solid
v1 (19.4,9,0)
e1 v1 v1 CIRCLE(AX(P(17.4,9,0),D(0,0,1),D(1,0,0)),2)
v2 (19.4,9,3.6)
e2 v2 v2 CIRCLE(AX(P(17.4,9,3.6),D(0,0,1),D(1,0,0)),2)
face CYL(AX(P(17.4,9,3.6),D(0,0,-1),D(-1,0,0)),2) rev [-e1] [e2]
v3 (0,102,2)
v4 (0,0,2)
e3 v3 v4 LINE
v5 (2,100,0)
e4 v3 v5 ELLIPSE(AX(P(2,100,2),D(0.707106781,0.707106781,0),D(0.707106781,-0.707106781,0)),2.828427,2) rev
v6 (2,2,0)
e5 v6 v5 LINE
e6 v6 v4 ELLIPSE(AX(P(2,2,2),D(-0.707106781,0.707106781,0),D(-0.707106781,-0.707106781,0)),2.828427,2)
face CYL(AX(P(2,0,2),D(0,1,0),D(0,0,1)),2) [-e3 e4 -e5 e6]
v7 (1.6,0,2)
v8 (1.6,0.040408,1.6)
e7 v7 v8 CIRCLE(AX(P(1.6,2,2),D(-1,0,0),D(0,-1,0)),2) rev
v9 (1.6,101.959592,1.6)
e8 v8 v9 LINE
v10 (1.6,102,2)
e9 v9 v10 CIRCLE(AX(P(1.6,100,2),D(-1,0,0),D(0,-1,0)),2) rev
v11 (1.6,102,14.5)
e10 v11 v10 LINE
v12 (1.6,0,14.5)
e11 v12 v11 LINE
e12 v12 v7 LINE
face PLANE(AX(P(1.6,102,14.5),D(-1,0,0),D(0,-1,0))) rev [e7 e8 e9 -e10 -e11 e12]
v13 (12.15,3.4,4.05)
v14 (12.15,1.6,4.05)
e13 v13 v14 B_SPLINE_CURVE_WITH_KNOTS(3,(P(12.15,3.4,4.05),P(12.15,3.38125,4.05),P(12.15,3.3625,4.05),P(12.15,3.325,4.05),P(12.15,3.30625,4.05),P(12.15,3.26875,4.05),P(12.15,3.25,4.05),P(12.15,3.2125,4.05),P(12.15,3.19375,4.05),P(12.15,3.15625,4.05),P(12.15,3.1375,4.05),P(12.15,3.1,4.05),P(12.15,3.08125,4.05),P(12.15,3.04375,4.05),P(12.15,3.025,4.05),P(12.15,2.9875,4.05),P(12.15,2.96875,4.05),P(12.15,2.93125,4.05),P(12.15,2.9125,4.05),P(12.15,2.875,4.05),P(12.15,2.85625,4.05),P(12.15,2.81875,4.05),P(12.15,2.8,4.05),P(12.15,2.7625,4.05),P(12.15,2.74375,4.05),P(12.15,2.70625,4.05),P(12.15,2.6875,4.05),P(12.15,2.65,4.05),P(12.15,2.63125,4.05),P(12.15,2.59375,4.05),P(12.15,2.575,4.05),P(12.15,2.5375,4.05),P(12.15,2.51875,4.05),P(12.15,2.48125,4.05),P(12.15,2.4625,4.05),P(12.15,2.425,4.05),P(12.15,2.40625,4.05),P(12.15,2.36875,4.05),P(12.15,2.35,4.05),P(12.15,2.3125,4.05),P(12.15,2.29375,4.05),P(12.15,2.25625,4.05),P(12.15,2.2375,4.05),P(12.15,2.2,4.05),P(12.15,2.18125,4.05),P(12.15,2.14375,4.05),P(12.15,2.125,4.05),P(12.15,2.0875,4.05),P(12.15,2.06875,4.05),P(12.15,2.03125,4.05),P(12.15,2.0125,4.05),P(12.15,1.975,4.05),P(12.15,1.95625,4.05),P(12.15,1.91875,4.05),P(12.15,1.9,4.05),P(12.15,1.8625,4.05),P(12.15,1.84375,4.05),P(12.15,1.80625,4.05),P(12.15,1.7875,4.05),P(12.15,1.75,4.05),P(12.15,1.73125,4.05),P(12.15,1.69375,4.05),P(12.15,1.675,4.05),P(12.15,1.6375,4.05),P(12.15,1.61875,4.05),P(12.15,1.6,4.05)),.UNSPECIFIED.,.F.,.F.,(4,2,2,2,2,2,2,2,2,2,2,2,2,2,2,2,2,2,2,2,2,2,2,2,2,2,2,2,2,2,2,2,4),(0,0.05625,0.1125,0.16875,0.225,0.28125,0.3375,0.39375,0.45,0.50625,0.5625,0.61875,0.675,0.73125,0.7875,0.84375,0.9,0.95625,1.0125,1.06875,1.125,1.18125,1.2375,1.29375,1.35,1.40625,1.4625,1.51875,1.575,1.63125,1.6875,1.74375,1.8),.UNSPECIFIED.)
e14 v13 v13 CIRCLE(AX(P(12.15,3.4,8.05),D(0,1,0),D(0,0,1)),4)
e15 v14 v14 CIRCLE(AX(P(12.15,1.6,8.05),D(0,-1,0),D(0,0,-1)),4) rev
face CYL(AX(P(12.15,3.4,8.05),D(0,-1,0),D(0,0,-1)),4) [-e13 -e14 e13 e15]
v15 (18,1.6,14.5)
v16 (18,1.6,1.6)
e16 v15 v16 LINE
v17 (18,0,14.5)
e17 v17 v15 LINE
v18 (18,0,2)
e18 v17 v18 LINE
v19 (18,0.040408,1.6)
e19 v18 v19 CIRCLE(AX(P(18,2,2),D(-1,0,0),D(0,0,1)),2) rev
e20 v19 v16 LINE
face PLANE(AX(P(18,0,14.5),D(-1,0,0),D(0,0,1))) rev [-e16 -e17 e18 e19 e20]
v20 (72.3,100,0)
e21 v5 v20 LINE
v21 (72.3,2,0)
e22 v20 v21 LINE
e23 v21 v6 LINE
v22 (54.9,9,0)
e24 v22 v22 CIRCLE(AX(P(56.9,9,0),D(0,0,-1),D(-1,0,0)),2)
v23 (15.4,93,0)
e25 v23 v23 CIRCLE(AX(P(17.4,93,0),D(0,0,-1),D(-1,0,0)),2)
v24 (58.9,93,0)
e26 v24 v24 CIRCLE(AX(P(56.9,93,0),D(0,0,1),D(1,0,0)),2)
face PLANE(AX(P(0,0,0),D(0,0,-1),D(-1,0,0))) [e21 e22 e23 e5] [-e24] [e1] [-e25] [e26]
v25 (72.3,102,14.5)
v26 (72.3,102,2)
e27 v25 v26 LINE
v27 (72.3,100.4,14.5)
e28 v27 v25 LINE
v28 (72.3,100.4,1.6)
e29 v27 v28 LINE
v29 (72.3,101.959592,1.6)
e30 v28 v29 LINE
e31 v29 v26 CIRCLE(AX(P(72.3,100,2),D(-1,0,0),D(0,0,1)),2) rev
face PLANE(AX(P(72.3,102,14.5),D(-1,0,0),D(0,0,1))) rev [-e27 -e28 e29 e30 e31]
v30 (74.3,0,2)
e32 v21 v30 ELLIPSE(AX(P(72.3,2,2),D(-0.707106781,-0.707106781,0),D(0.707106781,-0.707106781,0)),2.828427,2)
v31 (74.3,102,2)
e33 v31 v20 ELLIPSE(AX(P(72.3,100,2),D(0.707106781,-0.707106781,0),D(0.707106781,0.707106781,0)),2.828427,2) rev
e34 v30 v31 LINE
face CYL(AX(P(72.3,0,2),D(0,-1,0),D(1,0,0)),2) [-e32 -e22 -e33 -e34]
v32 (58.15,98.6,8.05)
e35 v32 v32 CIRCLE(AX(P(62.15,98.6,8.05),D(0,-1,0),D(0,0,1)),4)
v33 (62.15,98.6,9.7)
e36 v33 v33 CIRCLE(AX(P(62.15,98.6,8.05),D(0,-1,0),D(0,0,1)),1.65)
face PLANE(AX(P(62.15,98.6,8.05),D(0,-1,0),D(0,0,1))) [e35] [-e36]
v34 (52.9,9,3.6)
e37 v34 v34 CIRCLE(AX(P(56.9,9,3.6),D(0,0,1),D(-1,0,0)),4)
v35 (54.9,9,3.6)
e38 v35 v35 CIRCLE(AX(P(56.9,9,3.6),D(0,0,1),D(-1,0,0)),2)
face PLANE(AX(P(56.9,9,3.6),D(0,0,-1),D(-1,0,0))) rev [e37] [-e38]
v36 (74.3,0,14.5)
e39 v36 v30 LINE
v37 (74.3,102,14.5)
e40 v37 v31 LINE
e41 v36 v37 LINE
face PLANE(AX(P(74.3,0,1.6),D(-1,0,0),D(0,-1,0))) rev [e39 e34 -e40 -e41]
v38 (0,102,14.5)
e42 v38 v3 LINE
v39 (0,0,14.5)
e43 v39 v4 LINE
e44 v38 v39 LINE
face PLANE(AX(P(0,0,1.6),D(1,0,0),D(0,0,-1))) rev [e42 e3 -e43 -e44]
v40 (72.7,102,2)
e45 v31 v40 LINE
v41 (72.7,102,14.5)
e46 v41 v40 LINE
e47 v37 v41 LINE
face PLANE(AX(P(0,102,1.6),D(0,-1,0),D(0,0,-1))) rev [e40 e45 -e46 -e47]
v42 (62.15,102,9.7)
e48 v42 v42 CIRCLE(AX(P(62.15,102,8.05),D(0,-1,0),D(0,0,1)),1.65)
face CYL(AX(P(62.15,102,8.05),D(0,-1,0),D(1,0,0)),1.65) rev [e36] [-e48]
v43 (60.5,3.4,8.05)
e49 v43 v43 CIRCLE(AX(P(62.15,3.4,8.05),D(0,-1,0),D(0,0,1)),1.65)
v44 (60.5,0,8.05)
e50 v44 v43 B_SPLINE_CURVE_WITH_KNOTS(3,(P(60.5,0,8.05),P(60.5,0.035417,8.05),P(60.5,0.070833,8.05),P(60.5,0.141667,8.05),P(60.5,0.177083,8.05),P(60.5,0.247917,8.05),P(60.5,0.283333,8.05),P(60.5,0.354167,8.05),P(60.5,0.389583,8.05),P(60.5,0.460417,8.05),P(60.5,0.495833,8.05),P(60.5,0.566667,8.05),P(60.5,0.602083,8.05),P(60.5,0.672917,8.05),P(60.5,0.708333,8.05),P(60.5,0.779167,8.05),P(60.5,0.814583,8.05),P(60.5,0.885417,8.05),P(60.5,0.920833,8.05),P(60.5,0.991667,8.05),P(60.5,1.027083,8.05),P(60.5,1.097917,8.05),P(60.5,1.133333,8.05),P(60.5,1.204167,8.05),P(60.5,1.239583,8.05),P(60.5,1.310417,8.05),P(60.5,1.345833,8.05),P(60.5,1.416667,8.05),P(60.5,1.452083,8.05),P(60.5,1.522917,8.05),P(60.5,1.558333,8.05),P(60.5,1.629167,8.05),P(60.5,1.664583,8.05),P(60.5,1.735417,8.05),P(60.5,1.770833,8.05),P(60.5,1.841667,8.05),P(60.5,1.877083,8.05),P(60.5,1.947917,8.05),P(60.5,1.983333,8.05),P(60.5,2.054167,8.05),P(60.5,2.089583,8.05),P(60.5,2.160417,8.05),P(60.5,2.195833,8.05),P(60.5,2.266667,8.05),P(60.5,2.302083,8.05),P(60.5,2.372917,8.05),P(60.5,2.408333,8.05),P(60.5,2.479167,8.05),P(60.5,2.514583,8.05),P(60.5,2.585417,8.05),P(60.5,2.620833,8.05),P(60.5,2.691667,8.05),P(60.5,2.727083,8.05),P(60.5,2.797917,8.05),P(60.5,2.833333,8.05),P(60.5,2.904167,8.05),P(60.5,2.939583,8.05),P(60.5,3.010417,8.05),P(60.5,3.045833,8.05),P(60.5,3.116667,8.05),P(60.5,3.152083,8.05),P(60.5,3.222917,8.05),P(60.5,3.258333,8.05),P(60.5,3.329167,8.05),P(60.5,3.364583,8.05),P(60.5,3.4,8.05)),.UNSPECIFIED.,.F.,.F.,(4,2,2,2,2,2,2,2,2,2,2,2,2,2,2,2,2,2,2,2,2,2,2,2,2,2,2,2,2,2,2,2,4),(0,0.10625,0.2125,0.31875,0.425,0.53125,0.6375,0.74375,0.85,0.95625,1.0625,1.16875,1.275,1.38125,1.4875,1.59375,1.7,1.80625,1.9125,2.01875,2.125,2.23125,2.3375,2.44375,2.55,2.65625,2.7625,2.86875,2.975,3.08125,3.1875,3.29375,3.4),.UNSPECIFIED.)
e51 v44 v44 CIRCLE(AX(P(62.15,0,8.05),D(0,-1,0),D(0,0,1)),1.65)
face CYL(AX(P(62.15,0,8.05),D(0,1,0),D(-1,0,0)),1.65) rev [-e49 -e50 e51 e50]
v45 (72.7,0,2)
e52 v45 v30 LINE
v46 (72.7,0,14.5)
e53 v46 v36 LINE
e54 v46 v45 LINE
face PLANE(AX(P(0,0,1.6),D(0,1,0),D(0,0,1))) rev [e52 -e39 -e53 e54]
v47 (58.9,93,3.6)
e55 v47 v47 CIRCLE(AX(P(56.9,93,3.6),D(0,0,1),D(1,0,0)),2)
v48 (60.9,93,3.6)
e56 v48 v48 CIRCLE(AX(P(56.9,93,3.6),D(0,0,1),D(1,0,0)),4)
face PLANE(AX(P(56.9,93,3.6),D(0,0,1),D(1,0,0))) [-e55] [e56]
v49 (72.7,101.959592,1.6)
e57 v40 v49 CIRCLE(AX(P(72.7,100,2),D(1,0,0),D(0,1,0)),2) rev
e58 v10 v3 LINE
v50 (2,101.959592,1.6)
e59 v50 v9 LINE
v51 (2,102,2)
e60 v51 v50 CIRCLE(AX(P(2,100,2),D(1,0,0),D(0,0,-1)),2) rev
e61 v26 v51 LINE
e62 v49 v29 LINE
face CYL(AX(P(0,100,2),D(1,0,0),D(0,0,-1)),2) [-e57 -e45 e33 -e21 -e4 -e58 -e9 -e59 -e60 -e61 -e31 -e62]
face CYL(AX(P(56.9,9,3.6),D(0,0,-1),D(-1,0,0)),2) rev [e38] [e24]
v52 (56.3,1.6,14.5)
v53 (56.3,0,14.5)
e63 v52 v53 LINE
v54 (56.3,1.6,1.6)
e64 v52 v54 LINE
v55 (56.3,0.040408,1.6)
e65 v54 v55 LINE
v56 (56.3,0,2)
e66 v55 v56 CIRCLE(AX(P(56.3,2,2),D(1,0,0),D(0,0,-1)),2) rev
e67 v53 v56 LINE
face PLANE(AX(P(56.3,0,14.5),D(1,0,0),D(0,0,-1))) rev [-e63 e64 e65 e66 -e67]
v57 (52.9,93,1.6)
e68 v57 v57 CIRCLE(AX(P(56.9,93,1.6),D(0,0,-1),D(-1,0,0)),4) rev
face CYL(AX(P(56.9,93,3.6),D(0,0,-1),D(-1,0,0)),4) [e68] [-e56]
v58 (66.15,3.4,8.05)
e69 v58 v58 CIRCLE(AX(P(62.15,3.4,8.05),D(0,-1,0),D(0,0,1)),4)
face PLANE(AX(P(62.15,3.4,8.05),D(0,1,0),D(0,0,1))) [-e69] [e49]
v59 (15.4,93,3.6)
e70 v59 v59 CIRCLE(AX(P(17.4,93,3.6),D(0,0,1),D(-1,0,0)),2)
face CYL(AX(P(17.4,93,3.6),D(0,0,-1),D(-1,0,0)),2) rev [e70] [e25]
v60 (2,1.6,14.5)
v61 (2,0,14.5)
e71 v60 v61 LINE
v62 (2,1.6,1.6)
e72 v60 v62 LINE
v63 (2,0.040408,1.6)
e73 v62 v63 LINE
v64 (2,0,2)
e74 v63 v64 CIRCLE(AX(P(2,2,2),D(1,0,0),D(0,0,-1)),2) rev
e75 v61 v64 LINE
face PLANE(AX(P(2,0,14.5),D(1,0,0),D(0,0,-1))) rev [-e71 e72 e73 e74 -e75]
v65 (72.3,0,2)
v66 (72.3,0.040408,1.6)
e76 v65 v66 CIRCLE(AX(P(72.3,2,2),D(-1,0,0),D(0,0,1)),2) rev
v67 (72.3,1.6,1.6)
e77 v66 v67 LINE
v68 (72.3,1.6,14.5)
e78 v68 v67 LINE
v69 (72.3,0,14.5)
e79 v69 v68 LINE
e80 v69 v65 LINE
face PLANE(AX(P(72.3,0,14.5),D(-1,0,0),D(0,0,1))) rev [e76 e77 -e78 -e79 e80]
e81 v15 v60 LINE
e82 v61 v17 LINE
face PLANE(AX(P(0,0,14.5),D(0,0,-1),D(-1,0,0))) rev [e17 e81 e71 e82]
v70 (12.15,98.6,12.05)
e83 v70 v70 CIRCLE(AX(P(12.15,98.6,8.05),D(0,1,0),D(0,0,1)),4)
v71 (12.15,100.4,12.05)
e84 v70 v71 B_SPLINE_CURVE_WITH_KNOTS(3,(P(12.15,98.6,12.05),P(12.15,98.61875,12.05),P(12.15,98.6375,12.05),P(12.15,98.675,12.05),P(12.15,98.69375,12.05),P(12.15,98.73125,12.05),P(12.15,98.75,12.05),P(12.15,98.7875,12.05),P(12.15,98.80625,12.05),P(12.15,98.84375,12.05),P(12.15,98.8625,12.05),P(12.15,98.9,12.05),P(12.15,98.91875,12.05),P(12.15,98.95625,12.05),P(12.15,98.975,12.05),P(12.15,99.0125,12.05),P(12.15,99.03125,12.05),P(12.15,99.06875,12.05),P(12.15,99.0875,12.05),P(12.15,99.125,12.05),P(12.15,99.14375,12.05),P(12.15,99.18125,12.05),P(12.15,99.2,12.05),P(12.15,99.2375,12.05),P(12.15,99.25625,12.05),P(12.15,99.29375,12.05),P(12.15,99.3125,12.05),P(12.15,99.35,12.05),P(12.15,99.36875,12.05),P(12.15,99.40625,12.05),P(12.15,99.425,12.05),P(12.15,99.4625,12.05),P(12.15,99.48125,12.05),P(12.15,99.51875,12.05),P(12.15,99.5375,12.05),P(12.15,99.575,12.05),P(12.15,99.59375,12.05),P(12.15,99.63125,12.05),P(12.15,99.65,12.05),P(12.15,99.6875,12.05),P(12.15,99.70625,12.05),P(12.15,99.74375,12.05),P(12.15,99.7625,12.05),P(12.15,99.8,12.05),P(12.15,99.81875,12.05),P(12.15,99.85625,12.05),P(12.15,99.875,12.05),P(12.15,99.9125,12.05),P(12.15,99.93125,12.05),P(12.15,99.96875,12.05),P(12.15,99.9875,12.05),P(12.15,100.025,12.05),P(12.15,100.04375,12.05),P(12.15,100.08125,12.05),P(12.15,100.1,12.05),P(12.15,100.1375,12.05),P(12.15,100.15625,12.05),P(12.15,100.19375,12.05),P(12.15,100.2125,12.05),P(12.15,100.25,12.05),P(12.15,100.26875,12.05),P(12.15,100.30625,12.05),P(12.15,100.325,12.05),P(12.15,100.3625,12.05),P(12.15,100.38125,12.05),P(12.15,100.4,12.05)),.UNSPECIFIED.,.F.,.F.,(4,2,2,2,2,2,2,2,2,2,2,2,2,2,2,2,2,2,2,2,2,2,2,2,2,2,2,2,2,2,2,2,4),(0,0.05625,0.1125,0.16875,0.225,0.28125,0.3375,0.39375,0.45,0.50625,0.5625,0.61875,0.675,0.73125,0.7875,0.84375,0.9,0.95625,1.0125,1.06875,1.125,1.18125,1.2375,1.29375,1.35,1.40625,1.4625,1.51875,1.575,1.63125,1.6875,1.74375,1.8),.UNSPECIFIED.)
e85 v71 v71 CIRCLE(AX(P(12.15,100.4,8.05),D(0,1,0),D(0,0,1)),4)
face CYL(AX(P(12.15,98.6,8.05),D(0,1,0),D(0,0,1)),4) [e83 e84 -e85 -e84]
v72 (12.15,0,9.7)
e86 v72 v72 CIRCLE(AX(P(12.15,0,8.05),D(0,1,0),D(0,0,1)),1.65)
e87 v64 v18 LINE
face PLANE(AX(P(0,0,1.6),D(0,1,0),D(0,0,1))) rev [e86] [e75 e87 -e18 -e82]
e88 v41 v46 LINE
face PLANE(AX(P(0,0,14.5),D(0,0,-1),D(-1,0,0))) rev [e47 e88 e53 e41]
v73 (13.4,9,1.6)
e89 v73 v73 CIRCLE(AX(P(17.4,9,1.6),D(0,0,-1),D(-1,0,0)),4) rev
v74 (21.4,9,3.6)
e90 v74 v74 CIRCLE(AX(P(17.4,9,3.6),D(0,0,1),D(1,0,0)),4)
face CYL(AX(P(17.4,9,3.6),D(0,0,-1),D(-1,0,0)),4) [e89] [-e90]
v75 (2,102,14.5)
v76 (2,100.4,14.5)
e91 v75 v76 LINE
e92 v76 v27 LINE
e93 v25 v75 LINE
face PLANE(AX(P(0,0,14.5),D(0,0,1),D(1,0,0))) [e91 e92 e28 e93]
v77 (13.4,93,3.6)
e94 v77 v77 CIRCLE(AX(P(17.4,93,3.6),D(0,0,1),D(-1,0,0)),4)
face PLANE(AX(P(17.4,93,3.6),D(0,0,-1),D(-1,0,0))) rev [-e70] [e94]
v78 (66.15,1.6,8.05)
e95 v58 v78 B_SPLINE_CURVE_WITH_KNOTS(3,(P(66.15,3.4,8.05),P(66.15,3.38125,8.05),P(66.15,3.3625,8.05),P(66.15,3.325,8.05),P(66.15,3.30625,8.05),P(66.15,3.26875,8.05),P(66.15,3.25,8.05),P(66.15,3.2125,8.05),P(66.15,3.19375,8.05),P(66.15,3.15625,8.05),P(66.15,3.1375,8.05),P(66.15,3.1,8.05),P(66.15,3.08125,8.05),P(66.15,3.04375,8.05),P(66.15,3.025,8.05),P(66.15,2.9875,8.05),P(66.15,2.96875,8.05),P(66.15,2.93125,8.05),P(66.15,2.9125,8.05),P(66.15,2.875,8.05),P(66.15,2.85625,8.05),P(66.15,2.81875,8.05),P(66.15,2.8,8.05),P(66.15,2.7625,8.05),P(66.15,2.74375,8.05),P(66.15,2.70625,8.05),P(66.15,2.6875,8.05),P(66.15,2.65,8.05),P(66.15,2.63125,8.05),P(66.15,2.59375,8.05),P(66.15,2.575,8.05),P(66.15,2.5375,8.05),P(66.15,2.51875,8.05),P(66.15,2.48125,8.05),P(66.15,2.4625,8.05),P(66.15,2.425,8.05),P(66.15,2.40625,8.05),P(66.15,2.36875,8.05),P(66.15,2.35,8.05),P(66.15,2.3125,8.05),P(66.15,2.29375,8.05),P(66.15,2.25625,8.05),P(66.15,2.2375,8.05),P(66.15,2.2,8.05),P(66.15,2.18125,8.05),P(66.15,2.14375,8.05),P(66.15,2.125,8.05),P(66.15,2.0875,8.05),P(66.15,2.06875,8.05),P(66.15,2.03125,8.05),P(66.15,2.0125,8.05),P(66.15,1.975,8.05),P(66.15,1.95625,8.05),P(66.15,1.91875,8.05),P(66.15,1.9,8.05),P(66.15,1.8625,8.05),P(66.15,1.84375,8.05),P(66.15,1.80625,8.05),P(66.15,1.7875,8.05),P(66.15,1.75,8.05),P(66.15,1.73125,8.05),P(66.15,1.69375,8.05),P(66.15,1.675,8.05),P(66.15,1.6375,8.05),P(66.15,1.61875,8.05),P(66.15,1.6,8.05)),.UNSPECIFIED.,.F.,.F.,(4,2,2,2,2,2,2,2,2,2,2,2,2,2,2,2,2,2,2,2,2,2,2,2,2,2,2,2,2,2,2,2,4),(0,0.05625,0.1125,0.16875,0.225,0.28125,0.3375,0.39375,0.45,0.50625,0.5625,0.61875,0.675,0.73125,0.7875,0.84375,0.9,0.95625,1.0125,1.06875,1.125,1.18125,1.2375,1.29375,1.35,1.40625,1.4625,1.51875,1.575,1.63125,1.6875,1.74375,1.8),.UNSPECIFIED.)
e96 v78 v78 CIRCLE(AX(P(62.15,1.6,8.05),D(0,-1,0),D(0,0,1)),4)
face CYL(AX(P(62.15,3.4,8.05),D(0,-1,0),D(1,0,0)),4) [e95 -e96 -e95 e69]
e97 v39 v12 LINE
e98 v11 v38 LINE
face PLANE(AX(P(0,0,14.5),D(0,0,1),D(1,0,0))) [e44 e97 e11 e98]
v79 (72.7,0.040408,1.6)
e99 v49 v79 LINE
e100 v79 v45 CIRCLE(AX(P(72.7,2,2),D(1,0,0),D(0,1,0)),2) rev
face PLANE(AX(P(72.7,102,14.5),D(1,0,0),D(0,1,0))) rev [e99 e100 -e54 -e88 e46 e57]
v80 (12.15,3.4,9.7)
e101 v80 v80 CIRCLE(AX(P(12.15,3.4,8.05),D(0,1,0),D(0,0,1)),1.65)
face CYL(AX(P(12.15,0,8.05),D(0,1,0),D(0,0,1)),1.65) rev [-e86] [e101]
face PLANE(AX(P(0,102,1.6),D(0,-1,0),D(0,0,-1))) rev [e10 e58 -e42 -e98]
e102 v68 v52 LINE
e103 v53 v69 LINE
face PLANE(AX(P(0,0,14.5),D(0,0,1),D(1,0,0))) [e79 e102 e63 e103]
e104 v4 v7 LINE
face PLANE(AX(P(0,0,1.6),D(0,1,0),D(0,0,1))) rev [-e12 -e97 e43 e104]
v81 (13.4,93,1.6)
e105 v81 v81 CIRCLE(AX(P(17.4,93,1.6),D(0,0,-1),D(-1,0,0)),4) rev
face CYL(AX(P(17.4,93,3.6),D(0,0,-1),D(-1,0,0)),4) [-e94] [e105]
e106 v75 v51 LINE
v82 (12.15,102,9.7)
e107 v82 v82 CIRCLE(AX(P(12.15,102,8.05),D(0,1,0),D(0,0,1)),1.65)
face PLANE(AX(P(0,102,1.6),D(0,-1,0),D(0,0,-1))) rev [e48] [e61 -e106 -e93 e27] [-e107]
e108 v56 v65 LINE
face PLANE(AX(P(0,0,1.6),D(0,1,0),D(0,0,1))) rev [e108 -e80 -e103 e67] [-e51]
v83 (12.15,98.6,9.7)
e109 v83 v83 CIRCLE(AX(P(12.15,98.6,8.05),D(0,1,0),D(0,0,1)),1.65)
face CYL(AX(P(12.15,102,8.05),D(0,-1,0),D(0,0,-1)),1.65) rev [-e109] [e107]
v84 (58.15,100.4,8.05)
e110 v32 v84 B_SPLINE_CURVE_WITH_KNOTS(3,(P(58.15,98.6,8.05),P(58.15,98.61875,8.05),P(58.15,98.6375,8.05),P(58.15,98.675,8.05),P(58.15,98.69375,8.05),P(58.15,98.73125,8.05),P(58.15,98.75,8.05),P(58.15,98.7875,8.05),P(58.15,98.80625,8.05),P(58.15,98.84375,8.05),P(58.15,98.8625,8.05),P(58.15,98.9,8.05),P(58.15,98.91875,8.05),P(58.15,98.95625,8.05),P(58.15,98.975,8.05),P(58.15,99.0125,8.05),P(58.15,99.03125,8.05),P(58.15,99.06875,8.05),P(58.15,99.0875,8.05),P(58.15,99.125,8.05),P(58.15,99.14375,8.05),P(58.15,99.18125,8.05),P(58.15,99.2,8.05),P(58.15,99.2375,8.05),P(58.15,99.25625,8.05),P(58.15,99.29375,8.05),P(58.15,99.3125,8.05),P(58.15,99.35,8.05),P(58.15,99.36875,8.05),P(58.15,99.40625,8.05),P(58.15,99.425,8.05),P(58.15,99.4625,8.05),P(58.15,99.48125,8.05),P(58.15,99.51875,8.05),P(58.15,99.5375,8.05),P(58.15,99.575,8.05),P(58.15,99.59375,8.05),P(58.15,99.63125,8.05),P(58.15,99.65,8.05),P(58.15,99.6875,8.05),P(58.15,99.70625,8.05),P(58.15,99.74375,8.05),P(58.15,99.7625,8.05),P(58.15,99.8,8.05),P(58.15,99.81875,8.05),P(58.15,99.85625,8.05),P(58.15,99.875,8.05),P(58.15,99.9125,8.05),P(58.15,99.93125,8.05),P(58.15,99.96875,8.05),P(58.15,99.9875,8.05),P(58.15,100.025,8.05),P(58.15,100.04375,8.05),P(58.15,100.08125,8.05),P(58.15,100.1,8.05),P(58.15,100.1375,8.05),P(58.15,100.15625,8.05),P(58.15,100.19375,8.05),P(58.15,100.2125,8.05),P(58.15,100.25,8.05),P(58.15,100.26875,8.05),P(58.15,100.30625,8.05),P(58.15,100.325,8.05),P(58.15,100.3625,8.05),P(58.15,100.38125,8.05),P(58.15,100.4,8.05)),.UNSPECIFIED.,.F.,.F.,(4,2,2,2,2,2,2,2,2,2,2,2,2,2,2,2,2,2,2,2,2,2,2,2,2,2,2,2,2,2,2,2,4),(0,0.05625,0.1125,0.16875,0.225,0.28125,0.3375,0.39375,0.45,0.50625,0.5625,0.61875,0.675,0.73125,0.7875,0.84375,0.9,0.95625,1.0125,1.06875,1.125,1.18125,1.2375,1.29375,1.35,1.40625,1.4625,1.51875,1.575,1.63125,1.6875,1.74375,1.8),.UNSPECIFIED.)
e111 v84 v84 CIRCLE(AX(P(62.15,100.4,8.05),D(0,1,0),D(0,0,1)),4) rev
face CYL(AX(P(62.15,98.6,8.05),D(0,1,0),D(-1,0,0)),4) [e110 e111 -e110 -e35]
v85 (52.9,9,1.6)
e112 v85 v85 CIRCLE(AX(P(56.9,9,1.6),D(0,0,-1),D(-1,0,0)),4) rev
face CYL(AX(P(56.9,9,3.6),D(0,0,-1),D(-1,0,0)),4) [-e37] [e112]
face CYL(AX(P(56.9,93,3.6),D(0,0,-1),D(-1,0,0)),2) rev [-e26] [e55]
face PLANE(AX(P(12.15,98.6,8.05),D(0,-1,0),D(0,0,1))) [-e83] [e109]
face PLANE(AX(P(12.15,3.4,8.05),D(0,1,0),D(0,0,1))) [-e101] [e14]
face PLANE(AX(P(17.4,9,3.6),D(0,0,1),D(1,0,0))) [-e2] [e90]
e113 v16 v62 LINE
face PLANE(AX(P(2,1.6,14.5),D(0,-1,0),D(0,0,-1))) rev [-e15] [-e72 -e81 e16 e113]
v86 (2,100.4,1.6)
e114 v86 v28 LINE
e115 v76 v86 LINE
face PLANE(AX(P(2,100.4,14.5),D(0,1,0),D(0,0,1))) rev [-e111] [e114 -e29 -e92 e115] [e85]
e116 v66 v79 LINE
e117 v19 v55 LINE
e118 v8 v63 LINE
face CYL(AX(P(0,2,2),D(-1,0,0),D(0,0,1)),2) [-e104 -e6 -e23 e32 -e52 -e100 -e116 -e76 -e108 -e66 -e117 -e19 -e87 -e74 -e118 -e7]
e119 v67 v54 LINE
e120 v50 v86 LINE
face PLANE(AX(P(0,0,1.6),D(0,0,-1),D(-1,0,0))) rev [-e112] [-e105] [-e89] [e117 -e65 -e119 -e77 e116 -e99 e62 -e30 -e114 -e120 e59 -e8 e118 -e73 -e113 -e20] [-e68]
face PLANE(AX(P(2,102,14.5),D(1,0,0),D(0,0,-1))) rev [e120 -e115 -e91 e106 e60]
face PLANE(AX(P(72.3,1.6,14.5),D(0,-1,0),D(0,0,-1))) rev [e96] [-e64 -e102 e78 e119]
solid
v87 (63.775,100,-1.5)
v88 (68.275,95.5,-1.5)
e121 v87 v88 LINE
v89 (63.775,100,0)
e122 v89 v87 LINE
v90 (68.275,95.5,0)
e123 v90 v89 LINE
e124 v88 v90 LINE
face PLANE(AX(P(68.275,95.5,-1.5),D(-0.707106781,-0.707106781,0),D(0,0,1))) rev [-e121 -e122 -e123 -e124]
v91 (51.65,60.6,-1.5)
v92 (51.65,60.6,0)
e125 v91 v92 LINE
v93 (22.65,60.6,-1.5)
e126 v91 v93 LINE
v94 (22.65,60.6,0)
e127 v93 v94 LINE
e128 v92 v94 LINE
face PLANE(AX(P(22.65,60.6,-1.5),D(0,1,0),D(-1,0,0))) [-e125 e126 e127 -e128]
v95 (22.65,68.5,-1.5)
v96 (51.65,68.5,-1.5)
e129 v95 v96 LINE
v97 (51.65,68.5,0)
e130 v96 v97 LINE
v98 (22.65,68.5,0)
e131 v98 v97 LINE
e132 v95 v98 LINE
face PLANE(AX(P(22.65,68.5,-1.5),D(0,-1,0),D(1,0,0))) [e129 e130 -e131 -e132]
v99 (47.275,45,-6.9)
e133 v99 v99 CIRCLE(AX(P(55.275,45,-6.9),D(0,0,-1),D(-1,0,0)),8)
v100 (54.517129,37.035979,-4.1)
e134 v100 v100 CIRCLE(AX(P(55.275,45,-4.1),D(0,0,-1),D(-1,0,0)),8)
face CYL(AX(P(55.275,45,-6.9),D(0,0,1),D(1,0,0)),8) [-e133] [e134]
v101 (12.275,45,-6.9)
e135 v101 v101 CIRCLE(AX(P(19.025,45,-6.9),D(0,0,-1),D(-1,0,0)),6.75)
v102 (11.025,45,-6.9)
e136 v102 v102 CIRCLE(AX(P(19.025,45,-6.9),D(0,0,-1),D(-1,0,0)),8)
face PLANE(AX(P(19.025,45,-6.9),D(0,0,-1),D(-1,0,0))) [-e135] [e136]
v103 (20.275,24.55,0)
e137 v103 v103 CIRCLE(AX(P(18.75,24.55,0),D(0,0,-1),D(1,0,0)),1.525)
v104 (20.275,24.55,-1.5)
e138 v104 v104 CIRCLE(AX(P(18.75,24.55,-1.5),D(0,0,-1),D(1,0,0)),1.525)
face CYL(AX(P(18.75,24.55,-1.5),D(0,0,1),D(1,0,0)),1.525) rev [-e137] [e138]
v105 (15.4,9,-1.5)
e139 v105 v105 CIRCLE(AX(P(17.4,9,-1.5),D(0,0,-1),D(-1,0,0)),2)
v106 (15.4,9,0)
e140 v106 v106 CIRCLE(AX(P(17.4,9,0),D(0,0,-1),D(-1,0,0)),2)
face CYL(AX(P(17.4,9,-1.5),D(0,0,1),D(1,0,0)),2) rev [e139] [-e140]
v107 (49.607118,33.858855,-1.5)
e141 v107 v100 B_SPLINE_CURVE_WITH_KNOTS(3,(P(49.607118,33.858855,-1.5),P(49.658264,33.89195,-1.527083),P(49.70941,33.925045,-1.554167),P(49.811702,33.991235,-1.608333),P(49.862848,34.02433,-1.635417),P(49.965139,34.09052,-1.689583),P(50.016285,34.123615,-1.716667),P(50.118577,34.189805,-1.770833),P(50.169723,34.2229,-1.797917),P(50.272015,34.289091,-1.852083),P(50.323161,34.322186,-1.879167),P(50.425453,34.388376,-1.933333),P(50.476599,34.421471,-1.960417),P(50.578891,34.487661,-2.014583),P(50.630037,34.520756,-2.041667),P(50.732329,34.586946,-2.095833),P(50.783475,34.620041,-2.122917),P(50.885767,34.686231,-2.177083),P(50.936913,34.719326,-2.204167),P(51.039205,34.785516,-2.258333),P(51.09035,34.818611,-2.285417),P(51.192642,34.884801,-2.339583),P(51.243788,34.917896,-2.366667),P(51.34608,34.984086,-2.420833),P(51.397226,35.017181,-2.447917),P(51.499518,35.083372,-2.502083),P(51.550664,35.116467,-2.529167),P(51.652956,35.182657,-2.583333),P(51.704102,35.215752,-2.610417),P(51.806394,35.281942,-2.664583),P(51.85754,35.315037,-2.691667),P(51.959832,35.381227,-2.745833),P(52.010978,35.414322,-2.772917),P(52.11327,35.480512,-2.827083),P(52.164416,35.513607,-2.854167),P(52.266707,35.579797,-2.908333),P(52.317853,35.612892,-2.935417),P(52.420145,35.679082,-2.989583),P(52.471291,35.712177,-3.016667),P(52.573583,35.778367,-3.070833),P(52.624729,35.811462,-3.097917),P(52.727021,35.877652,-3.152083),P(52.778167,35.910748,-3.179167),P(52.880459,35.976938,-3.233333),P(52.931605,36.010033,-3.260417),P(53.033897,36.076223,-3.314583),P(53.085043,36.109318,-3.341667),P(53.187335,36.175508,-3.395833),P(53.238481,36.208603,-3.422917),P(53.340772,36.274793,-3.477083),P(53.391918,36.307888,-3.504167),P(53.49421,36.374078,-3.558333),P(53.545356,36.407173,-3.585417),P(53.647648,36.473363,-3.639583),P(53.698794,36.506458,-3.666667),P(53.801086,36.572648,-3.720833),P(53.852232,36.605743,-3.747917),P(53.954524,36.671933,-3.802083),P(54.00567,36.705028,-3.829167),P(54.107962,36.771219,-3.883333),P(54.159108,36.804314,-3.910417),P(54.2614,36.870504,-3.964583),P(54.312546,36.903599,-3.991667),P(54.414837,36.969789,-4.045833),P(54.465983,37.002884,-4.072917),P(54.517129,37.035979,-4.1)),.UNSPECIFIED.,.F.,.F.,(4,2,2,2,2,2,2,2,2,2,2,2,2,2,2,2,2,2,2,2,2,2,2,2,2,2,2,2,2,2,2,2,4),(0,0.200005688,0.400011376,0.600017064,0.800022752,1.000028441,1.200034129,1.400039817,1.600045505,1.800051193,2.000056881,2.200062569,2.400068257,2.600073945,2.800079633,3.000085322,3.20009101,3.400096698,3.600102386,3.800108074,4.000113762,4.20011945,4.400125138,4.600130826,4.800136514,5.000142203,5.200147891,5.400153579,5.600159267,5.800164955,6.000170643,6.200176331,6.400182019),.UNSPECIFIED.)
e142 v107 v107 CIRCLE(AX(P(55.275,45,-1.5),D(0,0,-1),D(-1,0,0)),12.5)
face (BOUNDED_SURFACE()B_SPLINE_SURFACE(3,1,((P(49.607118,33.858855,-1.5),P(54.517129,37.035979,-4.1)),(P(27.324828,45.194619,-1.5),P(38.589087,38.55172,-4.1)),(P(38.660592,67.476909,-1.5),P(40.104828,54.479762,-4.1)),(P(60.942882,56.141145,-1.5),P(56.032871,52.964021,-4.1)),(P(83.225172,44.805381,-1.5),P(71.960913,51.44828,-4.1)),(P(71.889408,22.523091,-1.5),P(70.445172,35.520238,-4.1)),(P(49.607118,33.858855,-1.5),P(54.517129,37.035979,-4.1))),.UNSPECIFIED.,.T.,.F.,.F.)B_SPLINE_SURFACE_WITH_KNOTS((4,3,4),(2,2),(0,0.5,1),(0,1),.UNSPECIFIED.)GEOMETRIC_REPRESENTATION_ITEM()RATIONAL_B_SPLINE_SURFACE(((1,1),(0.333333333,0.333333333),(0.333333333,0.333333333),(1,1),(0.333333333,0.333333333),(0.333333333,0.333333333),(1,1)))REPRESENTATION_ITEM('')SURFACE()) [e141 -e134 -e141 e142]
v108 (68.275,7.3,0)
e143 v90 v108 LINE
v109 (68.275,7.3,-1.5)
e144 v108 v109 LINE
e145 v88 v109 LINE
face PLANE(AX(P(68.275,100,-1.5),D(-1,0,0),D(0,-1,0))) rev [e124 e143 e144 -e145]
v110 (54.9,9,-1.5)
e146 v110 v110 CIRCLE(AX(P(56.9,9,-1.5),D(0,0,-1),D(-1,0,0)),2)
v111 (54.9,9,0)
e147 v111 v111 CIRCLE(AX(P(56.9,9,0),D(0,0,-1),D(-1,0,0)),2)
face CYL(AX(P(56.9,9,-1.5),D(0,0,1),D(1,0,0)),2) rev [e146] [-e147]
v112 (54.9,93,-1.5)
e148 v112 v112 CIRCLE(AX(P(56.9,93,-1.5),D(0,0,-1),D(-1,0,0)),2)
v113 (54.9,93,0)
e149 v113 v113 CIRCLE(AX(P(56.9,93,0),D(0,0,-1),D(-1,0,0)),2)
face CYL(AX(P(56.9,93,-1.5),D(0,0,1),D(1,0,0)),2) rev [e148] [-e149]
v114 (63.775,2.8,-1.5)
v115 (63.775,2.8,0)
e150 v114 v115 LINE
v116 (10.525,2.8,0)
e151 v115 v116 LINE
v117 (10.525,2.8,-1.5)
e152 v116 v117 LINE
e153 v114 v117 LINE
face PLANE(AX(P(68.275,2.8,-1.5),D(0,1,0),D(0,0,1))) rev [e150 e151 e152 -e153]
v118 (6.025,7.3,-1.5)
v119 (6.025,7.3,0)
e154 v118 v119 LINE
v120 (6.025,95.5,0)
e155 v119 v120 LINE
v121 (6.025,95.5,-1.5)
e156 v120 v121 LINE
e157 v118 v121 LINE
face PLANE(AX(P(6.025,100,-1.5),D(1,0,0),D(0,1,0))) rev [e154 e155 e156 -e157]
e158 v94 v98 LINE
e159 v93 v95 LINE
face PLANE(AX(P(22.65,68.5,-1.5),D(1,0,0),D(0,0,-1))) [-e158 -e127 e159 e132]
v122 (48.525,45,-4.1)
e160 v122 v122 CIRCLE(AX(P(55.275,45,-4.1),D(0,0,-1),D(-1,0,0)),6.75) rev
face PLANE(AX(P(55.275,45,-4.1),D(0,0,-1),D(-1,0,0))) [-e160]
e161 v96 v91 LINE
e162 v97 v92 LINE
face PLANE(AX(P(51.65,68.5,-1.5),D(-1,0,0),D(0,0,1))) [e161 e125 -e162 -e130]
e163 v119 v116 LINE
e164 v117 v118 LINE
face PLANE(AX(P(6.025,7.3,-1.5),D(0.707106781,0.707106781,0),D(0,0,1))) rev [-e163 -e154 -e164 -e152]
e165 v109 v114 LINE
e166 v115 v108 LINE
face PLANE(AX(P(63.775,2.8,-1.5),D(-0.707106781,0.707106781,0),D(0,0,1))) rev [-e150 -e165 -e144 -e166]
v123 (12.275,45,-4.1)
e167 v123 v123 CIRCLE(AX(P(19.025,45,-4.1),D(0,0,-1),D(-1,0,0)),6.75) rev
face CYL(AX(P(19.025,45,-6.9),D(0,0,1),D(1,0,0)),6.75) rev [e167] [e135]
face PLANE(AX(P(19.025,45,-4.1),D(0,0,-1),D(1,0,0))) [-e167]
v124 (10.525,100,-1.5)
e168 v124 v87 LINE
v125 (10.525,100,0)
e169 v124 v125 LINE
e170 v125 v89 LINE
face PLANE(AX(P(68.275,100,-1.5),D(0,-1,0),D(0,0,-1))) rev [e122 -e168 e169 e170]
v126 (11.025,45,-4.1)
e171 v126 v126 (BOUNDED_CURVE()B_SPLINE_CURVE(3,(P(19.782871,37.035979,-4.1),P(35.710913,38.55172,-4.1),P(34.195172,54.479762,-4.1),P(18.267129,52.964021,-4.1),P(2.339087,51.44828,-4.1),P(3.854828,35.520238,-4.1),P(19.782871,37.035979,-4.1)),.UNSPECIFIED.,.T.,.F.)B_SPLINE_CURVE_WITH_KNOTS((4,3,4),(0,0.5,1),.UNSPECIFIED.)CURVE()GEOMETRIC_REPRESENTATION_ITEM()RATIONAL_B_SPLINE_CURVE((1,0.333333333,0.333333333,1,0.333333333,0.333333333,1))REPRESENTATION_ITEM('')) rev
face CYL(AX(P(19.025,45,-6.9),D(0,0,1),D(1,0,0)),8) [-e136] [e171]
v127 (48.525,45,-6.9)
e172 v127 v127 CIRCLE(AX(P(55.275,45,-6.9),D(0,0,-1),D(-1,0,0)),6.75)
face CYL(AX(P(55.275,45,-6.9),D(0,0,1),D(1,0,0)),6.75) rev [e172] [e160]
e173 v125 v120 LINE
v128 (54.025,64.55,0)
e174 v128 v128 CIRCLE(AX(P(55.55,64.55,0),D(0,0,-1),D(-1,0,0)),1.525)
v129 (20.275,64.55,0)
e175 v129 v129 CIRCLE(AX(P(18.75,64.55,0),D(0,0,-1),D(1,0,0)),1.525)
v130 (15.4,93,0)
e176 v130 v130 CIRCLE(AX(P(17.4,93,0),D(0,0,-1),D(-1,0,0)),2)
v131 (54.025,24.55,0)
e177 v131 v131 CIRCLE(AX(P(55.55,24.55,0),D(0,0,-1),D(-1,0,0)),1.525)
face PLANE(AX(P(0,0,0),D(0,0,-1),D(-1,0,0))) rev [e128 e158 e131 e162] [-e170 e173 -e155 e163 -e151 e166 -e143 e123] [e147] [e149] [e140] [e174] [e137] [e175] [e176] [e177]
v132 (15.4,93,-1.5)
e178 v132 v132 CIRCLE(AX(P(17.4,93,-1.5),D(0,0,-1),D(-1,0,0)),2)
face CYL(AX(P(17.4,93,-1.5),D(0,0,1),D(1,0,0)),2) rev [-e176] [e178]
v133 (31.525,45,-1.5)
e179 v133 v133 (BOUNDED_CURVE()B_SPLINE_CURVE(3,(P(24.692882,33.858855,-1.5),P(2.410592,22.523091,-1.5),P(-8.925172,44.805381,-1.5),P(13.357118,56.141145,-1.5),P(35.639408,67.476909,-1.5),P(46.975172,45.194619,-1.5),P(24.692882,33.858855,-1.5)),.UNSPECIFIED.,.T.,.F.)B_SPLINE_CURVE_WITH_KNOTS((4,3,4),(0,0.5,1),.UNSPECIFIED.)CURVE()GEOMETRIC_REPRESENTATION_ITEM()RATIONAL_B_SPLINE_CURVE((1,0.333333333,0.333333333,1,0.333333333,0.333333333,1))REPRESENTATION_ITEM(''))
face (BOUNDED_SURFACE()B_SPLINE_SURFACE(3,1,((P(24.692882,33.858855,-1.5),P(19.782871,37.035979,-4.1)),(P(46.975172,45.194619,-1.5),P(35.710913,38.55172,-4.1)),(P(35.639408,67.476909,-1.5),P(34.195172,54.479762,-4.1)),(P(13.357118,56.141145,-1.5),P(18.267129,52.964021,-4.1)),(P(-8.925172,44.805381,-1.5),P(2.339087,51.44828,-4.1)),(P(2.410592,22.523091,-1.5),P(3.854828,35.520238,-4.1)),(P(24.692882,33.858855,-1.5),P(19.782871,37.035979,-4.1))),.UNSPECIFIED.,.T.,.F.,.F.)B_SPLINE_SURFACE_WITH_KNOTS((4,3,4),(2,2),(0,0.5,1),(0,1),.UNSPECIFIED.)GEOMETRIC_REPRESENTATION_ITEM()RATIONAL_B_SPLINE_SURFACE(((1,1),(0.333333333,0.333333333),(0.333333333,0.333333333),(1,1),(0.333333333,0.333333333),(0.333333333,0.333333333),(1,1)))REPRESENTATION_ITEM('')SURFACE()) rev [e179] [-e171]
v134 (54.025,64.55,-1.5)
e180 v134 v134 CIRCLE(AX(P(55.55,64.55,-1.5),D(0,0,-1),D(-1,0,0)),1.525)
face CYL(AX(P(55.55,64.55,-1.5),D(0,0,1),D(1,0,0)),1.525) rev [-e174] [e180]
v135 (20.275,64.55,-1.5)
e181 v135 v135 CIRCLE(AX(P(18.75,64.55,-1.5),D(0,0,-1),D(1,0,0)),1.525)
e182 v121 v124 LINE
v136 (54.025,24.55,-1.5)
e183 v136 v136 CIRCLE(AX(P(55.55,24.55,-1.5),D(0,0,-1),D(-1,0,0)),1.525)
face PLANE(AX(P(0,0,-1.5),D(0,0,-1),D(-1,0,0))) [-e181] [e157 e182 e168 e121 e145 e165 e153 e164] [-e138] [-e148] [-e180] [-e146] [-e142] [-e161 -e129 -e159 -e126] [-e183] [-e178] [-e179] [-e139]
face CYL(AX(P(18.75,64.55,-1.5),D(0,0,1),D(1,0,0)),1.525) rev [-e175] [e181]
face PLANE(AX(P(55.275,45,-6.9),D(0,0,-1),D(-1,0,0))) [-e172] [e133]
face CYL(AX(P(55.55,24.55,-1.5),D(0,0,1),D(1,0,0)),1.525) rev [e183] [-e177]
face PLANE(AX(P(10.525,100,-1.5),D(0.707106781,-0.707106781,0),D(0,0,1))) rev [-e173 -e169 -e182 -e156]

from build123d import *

# Parameters (mm, degrees)
SKETCH1_W                 = 74.3
SKETCH1_H                 = 102
BOSS_EXTRUDE1_DEPTH       = 1.6
SKETCH2_W                 = 1.6
SKETCH2_H                 = 102
SKETCH2_W_2               = 16
SKETCH2_H_2               = 1.6
SKETCH2_W_3               = 70.3
BOSS_EXTRUDE2_DEPTH       = 12.9
FILLET1_R                 = 2
SKETCH3_R                 = 4
SKETCH3_R_2               = 2
BOSS_EXTRUDE3_DEPTH       = 2
CUT_EXTRUDE1_START        = -1.6
SKETCH3_3_R               = 2
CUT_EXTRUDE1_DEPTH        = 1.6
SKETCH4_W                 = 62.25
SKETCH4_H                 = 97.2
SKETCH4_R                 = 2
SKETCH4_R_2               = 1.525
SKETCH4_W_2               = 29
SKETCH4_H_2               = 7.9
BOSS_EXTRUDE4_DEPTH       = 1.5
CHAMFER1_SIZE             = 4.5
SKETCH7_R                 = 8
SKETCH7_R_2               = 6.75
BOSS_EXTRUDE5_DEPTH       = 2.8
SKETCH9_R                 = 1.65
CUT_EXTRUDE4_DEPTH        = 126.741401296
BOSS_EXTRUDE7_START       = 1.8
SKETCH9_6_R               = 4
SKETCH9_6_R_2             = 1.65
BOSS_EXTRUDE7_DEPTH       = 1.8
MIRROR3_COPY_1_SKETCH_R   = 1.65
MIRROR3_COPY_1_DEPTH      = 126.741401296
MIRROR3_START             = 1.8
MIRROR3_COPY_2_SKETCH_R   = 4
MIRROR3_COPY_2_SKETCH_R_2 = 1.65
MIRROR3_COPY_2_DEPTH      = 1.8


with BuildPart() as part:
    # Sketch1 → Boss-Extrude1 (new body)
    with BuildSketch(Plane.XY):
        with Locations((37.15, 51)):
            Rectangle(SKETCH1_W, SKETCH1_H)
    extrude(amount=BOSS_EXTRUDE1_DEPTH)

    # Sketch2 → Boss-Extrude2 (add)
    with BuildSketch(Plane.XY.offset(1.6)):
        with Locations((0.8, 51)):
            Rectangle(SKETCH2_W, SKETCH2_H)
        with Locations((73.5, 51)):
            Rectangle(SKETCH2_W, SKETCH2_H)
        with Locations((64.3, 0.8)):
            Rectangle(SKETCH2_W_2, SKETCH2_H_2)
        with Locations((37.15, 101.2)):
            Rectangle(SKETCH2_W_3, SKETCH2_H_2)
        with Locations((10, 0.8)):
            Rectangle(SKETCH2_W_2, SKETCH2_H_2)
    extrude(amount=BOSS_EXTRUDE2_DEPTH)

    # Fillet1
    # the kernel refuses this fillet: 2 mm, written as the material it takes off along each edge
    with BuildSketch(Plane(origin=(0, 107, 0), x_dir=(1, 0, 0), z_dir=(0, -1, 0)), Plane(origin=(74.3, -5, 0), x_dir=(-1, 0, 0), z_dir=(0, 1, 0))) as fillet1_piece_1:
        with BuildLine():
            CenterArc((FILLET1_R, FILLET1_R), FILLET1_R, 180, 90)
            Line((0, FILLET1_R), (0, 0))
            Line((0, 0), (FILLET1_R, 0))
        make_face()
    extrude(amount=112, mode=Mode.SUBTRACT)
    with BuildSketch(Plane(origin=(-5, 0, 0), x_dir=(0, 0, 1), z_dir=(1, 0, 0))) as fillet1_piece_2:
        with BuildLine():
            CenterArc((FILLET1_R, -FILLET1_R), FILLET1_R, 90, 90)
            Line((0, -FILLET1_R), (0, 0))
            Line((0, 0), (FILLET1_R, 0))
        make_face()
    extrude(amount=84.3, mode=Mode.SUBTRACT)
    with BuildSketch(Plane(origin=(79.3, 102, 0), x_dir=(0, -1, 0), z_dir=(-1, 0, 0))) as fillet1_piece_3:
        with BuildLine():
            CenterArc((FILLET1_R, FILLET1_R), FILLET1_R, 180, 90)
            Line((0, FILLET1_R), (0, 0))
            Line((0, 0), (FILLET1_R, 0))
        make_face()
    extrude(amount=84.3, mode=Mode.SUBTRACT)

    # Sketch3 → Boss-Extrude3 (add)
    # profile 1 of 4: a face of its own
    with BuildSketch(Plane.XY.offset(1.6)):
        with Locations(Location((17.4, 9, 0), (0, 0, 180))):
            Circle(SKETCH3_R)
        with Locations((17.4, 9)):
            Circle(SKETCH3_R_2, mode=Mode.SUBTRACT)
    # profile 2 of 4: a face of its own
    with BuildSketch(Plane.XY.offset(1.6)):
        with Locations(Location((56.9, 9, 0), (0, 0, 180))):
            Circle(SKETCH3_R)
        with Locations(Location((56.9, 9, 0), (0, 0, 180))):
            Circle(SKETCH3_R_2, mode=Mode.SUBTRACT)
    # profile 3 of 4: a face of its own
    with BuildSketch(Plane.XY.offset(1.6)):
        with Locations(Location((56.9, 93, 0), (0, 0, 180))):
            Circle(SKETCH3_R)
        with Locations((56.9, 93)):
            Circle(SKETCH3_R_2, mode=Mode.SUBTRACT)
    # profile 4 of 4: a face of its own
    with BuildSketch(Plane.XY.offset(1.6)):
        with Locations(Location((17.4, 93, 0), (0, 0, 180))):
            Circle(SKETCH3_R)
        with Locations(Location((17.4, 93, 0), (0, 0, 180))):
            Circle(SKETCH3_R_2, mode=Mode.SUBTRACT)
    extrude(amount=BOSS_EXTRUDE3_DEPTH)

    # Sketch3<3> → Cut-Extrude1 (cut)
    with BuildSketch(Plane.XY.offset(1.6).offset(CUT_EXTRUDE1_START)):
        with Locations((17.4, 9)):
            Circle(SKETCH3_3_R)
        with Locations(Location((56.9, 9, 0), (0, 0, 180))):
            Circle(SKETCH3_3_R)
        with Locations((56.9, 93)):
            Circle(SKETCH3_3_R)
        with Locations(Location((17.4, 93, 0), (0, 0, 180))):
            Circle(SKETCH3_3_R)
    extrude(amount=CUT_EXTRUDE1_DEPTH, mode=Mode.SUBTRACT)

    # Sketch9 → Cut-Extrude4 (cut, through all)
    with BuildSketch(Plane(origin=(0, 1.6, 0), x_dir=(1, 0, 0), z_dir=(0, 1, 0))):
        with Locations(Location((12.15, -8.05, 0), (0, 0, 270))):
            Circle(SKETCH9_R)
    cut_extrude4 = extrude(amount=-CUT_EXTRUDE4_DEPTH, mode=Mode.SUBTRACT)

    # Sketch9<6> → Boss-Extrude7 (add)
    with BuildSketch(Plane(origin=(0, 1.6, 0), x_dir=(1, 0, 0), z_dir=(0, 1, 0)).offset(BOSS_EXTRUDE7_START)):
        with Locations(Location((12.15, -8.05, 0), (0, 0, 90))):
            Circle(SKETCH9_6_R)
        with Locations(Location((12.15, -8.05, 0), (0, 0, 270))):
            Circle(SKETCH9_6_R_2, mode=Mode.SUBTRACT)
    boss_extrude7 = extrude(amount=-BOSS_EXTRUDE7_DEPTH)

    # Mirror2: Cut-Extrude4, Boss-Extrude7 across plane
    add(cut_extrude4.mirror(Plane(origin=(37.15, 0, 0), x_dir=(0, 0, 1), z_dir=(1, 0, 0))), mode=Mode.SUBTRACT)
    add(boss_extrude7.mirror(Plane(origin=(37.15, 0, 0), x_dir=(0, 0, 1), z_dir=(1, 0, 0))))

    # Mirror3: Cut-Extrude4, Boss-Extrude7 across plane
    add(cut_extrude4.mirror(Plane.ZX.offset(51)), mode=Mode.SUBTRACT)
    add(boss_extrude7.mirror(Plane.ZX.offset(51)))

    # Mirror3 copy 1 sketch → Mirror3 copy 1 (cut, through all)
    with BuildSketch(Plane(origin=(74.3, 100.4, 0), x_dir=(-1, 0, 0), z_dir=(0, -1, 0))):
        with Locations(Location((12.15, -8.05, 0), (0, 0, 270))):
            Circle(MIRROR3_COPY_1_SKETCH_R)
    extrude(amount=-MIRROR3_COPY_1_DEPTH, mode=Mode.SUBTRACT)

    # Mirror3 copy 2 sketch → Mirror3 copy 2 (add)
    with BuildSketch(Plane(origin=(74.3, 100.4, 0), x_dir=(-1, 0, 0), z_dir=(0, -1, 0)).offset(MIRROR3_START)):
        with Locations(Location((12.15, -8.05, 0), (0, 0, 90))):
            Circle(MIRROR3_COPY_2_SKETCH_R)
        with Locations(Location((12.15, -8.05, 0), (0, 0, 270))):
            Circle(MIRROR3_COPY_2_SKETCH_R_2, mode=Mode.SUBTRACT)
    extrude(amount=-MIRROR3_COPY_2_DEPTH)


with BuildPart() as body_2:
    # Sketch4 → Boss-Extrude4 (new body)
    with BuildSketch(Plane(origin=(0, 0, 0), x_dir=(-1, 0, 0), z_dir=(0, 0, -1))):
        with Locations((-37.15, 51.4)):
            Rectangle(SKETCH4_W, SKETCH4_H)
        with Locations((-56.9, 93)):
            Circle(SKETCH4_R, mode=Mode.SUBTRACT)
        with Locations((-17.4, 93)):
            Circle(SKETCH4_R, mode=Mode.SUBTRACT)
        with Locations((-17.4, 9)):
            Circle(SKETCH4_R, mode=Mode.SUBTRACT)
        with Locations((-56.9, 9)):
            Circle(SKETCH4_R, mode=Mode.SUBTRACT)
        with Locations((-55.55, 64.55)):
            Circle(SKETCH4_R_2, mode=Mode.SUBTRACT)
        with Locations(Location((-18.75, 64.55, 0), (0, 0, 180))):
            Circle(SKETCH4_R_2, mode=Mode.SUBTRACT)
        with Locations((-55.55, 24.55)):
            Circle(SKETCH4_R_2, mode=Mode.SUBTRACT)
        with Locations(Location((-18.75, 24.55, 0), (0, 0, 180))):
            Circle(SKETCH4_R_2, mode=Mode.SUBTRACT)
        with Locations((-37.15, 64.55)):
            Rectangle(SKETCH4_W_2, SKETCH4_H_2, mode=Mode.SUBTRACT)
    extrude(amount=BOSS_EXTRUDE4_DEPTH)

    # Chamfer1
    chamfer1_edges = [body_2.edges().sort_by_distance(p)[0] for p in [
        (68.275, 100, -0.75),
        (6.025, 100, -0.75),
        (6.025, 2.8, -0.75),
        (68.275, 2.8, -0.75),
    ]]
    chamfer(chamfer1_edges, length=CHAMFER1_SIZE)

    # Loft1: read off the stored shape, not the designer's step
    # Loft1: loft between two sections, ruled curve by curve
    loft1_from = [
        Edge.make_bspline([(49.607117822, 33.858855013, -1.5), (27.324827848, 45.19461937, -1.5), (38.660592205, 67.476909343, -1.5), (60.942882178, 56.141144987, -1.5), (83.225172152, 44.80538063, -1.5), (71.889407795, 22.523090657, -1.5), (49.607117822, 33.858855013, -1.5)], [0, 0, 0, 0, 0.5, 0.5, 0.5, 1, 1, 1, 1], 3, [1, 0.333333333, 0.333333333, 1, 0.333333333, 0.333333333, 1]),
    ]
    loft1_to = [
        Edge.make_bspline([(54.517129402, 37.035978895, -4.1), (38.589087193, 38.551720091, -4.1), (40.104828388, 54.4797623, -4.1), (56.032870598, 52.964021105, -4.1), (71.960912807, 51.448279909, -4.1), (70.445171612, 35.5202377, -4.1), (54.517129402, 37.035978895, -4.1)], [0, 0, 0, 0, 0.5, 0.5, 0.5, 1, 1, 1, 1], 3, [1, 0.333333333, 0.333333333, 1, 0.333333333, 0.333333333, 1]),
    ]
    loft1 = Solid(Shell([*[Face.make_surface_from_curves(loft1_from[k], loft1_to[k]) for k in range(1)], Face(Wire(loft1_from)), Face(Wire(loft1_to))]))
    add(loft1)

    # Mirror1: Loft1 across plane
    add(loft1.mirror(Plane(origin=(37.15, 0, 0), x_dir=(0, 0, 1), z_dir=(1, 0, 0))))

    # Sketch7 → Boss-Extrude5 (add)
    # profile 1 of 2: a face of its own
    with BuildSketch(Plane(origin=(0, 0, -4.1), x_dir=(-1, 0, 0), z_dir=(0, 0, -1))):
        with Locations(Location((-55.275, 45, 0), (0, 0, 275.436))):
            Circle(SKETCH7_R)
        with Locations((-55.275, 45)):
            Circle(SKETCH7_R_2, mode=Mode.SUBTRACT)
    # profile 2 of 2: a face of its own
    with BuildSketch(Plane(origin=(0, 0, -4.1), x_dir=(-1, 0, 0), z_dir=(0, 0, -1))):
        with Locations((-19.025, 45)):
            Circle(SKETCH7_R)
        with Locations((-19.025, 45)):
            Circle(SKETCH7_R_2, mode=Mode.SUBTRACT)
    extrude(amount=BOSS_EXTRUDE5_DEPTH)


solid = Compound([part.part, body_2.part])
